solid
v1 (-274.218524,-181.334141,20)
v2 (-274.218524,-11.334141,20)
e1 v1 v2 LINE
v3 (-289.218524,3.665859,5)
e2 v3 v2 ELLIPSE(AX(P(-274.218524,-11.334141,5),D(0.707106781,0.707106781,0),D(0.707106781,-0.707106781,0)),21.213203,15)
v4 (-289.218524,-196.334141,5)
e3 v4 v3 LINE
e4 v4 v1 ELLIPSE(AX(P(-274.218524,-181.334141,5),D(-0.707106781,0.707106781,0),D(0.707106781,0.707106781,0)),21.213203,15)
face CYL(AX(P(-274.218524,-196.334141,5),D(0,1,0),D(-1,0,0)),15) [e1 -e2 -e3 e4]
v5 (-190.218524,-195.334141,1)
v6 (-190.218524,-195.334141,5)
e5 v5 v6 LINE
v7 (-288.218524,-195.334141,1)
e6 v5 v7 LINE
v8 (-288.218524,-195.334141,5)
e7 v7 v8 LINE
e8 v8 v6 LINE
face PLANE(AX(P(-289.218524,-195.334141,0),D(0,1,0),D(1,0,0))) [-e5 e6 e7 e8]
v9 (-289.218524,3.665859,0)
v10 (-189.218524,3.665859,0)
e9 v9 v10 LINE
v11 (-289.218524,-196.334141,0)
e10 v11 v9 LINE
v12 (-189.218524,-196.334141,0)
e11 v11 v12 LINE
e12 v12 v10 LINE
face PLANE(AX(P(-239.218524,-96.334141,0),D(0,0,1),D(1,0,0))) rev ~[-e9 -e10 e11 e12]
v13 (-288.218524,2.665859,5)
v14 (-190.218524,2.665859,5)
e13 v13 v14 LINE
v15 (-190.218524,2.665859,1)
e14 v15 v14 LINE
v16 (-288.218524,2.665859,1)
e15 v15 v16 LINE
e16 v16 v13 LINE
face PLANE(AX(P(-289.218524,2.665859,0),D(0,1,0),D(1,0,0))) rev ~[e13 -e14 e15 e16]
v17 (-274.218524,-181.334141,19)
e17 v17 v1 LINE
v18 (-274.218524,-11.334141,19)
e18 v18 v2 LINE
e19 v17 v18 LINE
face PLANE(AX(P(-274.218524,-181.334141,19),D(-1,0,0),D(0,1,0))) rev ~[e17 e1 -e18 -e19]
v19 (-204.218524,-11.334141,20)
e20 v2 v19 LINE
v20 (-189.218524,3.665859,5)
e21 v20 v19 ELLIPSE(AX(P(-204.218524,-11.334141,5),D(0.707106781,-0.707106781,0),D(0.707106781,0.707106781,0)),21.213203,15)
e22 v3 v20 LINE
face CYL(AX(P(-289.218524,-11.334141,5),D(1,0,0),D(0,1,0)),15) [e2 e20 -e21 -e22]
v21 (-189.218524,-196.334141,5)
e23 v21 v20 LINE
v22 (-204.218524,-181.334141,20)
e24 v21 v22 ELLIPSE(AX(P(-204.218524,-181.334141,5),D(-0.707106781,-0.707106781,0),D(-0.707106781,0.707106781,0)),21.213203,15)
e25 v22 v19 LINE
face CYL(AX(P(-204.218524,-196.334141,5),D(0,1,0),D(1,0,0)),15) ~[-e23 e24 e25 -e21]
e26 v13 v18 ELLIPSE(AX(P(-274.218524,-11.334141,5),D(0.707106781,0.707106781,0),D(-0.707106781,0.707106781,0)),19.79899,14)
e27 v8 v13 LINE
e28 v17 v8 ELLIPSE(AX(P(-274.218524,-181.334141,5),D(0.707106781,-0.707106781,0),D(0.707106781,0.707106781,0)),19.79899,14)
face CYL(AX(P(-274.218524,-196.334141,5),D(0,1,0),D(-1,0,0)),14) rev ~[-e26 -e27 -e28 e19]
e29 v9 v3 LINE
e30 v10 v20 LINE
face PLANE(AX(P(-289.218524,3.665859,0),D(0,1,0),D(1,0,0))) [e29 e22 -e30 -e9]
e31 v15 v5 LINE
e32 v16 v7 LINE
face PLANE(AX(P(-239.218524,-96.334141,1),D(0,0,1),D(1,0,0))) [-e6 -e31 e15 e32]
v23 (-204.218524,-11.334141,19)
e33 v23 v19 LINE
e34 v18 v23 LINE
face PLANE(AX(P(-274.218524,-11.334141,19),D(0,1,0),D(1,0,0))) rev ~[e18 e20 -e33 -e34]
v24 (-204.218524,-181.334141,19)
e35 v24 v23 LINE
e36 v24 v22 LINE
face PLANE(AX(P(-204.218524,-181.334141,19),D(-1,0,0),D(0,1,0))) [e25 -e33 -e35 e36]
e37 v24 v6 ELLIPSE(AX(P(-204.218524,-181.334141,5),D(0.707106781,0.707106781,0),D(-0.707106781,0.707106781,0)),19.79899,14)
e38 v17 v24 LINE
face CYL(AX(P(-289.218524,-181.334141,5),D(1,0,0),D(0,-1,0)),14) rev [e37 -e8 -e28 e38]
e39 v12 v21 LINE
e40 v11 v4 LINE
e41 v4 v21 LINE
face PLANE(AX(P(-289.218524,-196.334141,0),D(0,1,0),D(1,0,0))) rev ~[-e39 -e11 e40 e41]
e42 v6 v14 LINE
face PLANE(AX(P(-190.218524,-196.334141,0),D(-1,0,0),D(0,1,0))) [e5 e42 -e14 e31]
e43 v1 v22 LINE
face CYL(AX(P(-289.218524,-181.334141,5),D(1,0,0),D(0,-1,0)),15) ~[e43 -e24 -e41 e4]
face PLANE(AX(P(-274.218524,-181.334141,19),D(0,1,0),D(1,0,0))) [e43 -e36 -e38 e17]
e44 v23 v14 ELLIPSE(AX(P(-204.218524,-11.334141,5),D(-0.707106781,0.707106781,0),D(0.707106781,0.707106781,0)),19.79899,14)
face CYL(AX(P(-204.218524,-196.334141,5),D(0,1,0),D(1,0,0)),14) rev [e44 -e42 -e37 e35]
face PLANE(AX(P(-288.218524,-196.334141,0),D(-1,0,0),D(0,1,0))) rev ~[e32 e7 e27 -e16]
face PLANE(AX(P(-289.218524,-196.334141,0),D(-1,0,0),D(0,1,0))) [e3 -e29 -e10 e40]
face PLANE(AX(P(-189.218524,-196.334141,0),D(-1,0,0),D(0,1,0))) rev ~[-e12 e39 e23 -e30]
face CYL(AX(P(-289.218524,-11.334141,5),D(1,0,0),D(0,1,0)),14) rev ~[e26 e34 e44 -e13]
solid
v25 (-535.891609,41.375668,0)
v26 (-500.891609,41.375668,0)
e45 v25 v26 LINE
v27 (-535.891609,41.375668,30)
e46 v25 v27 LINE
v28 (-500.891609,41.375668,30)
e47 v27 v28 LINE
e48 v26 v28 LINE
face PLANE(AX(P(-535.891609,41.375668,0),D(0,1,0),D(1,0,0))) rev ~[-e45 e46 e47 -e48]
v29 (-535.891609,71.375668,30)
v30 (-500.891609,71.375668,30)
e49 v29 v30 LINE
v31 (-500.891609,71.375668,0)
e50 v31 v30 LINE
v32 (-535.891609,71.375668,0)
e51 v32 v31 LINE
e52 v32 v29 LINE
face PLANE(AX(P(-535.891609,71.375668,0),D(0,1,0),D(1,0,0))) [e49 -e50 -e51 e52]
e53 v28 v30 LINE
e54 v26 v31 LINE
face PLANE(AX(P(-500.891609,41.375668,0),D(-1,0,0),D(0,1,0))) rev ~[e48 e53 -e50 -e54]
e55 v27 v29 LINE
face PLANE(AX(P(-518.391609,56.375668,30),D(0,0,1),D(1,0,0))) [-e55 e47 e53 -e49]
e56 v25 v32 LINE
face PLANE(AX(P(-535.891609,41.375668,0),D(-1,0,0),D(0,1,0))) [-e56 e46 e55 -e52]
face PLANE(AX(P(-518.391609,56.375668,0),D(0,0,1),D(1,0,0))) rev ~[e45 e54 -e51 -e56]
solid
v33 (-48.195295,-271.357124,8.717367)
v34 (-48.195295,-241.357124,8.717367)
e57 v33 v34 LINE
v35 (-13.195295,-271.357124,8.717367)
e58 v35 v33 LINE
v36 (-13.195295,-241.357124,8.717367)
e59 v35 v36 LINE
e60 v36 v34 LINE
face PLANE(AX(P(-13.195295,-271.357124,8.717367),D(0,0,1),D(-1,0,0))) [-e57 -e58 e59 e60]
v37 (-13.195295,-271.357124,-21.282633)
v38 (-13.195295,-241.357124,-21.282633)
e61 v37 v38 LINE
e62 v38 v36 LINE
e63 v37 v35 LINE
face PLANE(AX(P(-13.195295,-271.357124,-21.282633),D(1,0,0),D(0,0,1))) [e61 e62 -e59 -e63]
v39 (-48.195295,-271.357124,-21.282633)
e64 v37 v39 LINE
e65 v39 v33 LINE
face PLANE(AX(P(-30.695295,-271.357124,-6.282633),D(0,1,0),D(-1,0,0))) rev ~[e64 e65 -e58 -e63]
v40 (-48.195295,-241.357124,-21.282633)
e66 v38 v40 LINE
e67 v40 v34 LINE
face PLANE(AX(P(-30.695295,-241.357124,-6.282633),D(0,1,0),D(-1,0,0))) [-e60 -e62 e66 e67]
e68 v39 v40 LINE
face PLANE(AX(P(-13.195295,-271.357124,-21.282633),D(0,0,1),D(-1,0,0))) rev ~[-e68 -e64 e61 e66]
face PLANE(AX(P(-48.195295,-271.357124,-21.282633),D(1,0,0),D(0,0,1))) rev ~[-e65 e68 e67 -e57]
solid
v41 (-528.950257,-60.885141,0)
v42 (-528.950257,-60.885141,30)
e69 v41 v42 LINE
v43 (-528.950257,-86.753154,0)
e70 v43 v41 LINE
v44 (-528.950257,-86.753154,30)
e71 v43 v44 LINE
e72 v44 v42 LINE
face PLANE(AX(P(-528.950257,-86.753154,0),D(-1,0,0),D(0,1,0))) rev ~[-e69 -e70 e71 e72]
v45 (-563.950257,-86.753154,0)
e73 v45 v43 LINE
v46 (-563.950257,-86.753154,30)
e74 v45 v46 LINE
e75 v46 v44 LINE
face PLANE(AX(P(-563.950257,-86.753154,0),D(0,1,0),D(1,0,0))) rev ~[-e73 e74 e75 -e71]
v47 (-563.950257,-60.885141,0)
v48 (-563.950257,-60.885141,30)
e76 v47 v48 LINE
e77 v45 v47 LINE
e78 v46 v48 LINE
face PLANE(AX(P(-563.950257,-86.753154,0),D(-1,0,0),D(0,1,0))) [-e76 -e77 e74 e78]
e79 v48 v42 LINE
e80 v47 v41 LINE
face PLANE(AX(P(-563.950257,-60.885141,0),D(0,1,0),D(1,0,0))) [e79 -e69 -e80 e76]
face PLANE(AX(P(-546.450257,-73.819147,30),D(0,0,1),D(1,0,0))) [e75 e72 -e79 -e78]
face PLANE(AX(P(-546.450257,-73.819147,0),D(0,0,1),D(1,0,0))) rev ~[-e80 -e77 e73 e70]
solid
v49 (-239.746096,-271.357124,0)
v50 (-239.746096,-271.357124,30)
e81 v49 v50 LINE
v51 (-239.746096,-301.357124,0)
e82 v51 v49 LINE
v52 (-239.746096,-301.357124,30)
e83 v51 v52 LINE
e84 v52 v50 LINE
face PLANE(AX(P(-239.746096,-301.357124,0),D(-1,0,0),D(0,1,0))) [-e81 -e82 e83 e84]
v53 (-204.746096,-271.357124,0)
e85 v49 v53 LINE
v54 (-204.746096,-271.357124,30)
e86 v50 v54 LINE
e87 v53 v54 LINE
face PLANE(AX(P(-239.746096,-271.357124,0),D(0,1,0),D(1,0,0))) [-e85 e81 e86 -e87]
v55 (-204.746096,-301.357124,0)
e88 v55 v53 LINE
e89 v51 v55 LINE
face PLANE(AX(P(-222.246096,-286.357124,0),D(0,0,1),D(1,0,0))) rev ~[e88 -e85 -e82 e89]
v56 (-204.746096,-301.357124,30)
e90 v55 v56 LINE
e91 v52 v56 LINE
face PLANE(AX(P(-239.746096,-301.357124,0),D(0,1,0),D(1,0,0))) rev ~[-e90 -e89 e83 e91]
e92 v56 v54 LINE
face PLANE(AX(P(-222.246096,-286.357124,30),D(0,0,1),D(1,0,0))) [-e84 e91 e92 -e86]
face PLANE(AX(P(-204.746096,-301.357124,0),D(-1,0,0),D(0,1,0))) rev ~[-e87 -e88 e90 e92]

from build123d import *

# Parameters (mm, degrees)
F0_W      = 100
F0_H      = 200
F1_DEPTH  = 20
F2_R      = 15
F3_T      = -1
F4_W      = 35
F4_H      = 30
F5_DEPTH  = 30
F6_W      = 35
F6_H      = 30
F7_DEPTH  = 30
F8_W      = 35
F8_H      = 25.8680122671
F9_DEPTH  = 30
F10_W     = 35
F10_H     = 30
F11_DEPTH = 30


# Not quite as in the source:
# - a shell that OpenCascade refuses in one call is made with other operations: the cavity is built on its own and cut out


with BuildPart() as f1:
    # F0 (on Top) → F1 (new body)
    with BuildSketch(Plane.XY):
        with Locations((-239.2185236739, -96.3341407478)):
            Rectangle(F0_W, F0_H)
    extrude(amount=F1_DEPTH)

    # F2
    f2_edges = [f1.edges().sort_by_distance(p)[0] for p in [
        (-189.218524, -96.334141, 20),
        (-239.218524, -196.334141, 20),
        (-239.218524, 3.665859, 20),
        (-289.218524, -96.334141, 20),
    ]]
    fillet(f2_edges, radius=F2_R)

    # F3: a shell. OpenCascade refuses it in one call, so the cavity is built on its own and cut out:
    # the body offset inwards by the wall thickness, plus a prism from it out through each open face.
    f3_core = offset(f1.part, amount=F3_T, mode=Mode.PRIVATE)
    f3_exits = [f3_core.faces().sort_by_distance(p)[0] for p in [
        (-239.218524, -96.334141, 19),
    ]]
    add(f3_core, mode=Mode.SUBTRACT)
    extrude(f3_exits, amount=-F3_T, mode=Mode.SUBTRACT)


with BuildPart() as f5:
    # F4 (on Top) → F5 (new body)
    with BuildSketch(Plane.XY):
        with Locations((-222.2460955381, -286.3571236897)):
            Rectangle(F4_W, F4_H)
    extrude(amount=F5_DEPTH)


with BuildPart() as f7:
    # F6 (on face) → F7 (new body)
    with BuildSketch(Plane(origin=(0, -271.3571236897, 0), x_dir=(-1, 0, 0), z_dir=(0, 1, 0))):
        with Locations((30.6952949613, -6.2826325541)):
            Rectangle(F6_W, F6_H)
    extrude(amount=F7_DEPTH)


with BuildPart() as f9:
    # F8 (on Top) → F9 (new body)
    with BuildSketch(Plane.XY):
        with Locations((-546.4502573013, -73.8191474229)):
            Rectangle(F8_W, F8_H)
    extrude(amount=F9_DEPTH)


with BuildPart() as f11:
    # F10 (on Top) → F11 (new body)
    with BuildSketch(Plane.XY):
        with Locations((-518.3916091919, 56.3756684118)):
            Rectangle(F10_W, F10_H)
    extrude(amount=F11_DEPTH)


solid = Compound([f1.part, f5.part, f7.part, f9.part, f11.part])
